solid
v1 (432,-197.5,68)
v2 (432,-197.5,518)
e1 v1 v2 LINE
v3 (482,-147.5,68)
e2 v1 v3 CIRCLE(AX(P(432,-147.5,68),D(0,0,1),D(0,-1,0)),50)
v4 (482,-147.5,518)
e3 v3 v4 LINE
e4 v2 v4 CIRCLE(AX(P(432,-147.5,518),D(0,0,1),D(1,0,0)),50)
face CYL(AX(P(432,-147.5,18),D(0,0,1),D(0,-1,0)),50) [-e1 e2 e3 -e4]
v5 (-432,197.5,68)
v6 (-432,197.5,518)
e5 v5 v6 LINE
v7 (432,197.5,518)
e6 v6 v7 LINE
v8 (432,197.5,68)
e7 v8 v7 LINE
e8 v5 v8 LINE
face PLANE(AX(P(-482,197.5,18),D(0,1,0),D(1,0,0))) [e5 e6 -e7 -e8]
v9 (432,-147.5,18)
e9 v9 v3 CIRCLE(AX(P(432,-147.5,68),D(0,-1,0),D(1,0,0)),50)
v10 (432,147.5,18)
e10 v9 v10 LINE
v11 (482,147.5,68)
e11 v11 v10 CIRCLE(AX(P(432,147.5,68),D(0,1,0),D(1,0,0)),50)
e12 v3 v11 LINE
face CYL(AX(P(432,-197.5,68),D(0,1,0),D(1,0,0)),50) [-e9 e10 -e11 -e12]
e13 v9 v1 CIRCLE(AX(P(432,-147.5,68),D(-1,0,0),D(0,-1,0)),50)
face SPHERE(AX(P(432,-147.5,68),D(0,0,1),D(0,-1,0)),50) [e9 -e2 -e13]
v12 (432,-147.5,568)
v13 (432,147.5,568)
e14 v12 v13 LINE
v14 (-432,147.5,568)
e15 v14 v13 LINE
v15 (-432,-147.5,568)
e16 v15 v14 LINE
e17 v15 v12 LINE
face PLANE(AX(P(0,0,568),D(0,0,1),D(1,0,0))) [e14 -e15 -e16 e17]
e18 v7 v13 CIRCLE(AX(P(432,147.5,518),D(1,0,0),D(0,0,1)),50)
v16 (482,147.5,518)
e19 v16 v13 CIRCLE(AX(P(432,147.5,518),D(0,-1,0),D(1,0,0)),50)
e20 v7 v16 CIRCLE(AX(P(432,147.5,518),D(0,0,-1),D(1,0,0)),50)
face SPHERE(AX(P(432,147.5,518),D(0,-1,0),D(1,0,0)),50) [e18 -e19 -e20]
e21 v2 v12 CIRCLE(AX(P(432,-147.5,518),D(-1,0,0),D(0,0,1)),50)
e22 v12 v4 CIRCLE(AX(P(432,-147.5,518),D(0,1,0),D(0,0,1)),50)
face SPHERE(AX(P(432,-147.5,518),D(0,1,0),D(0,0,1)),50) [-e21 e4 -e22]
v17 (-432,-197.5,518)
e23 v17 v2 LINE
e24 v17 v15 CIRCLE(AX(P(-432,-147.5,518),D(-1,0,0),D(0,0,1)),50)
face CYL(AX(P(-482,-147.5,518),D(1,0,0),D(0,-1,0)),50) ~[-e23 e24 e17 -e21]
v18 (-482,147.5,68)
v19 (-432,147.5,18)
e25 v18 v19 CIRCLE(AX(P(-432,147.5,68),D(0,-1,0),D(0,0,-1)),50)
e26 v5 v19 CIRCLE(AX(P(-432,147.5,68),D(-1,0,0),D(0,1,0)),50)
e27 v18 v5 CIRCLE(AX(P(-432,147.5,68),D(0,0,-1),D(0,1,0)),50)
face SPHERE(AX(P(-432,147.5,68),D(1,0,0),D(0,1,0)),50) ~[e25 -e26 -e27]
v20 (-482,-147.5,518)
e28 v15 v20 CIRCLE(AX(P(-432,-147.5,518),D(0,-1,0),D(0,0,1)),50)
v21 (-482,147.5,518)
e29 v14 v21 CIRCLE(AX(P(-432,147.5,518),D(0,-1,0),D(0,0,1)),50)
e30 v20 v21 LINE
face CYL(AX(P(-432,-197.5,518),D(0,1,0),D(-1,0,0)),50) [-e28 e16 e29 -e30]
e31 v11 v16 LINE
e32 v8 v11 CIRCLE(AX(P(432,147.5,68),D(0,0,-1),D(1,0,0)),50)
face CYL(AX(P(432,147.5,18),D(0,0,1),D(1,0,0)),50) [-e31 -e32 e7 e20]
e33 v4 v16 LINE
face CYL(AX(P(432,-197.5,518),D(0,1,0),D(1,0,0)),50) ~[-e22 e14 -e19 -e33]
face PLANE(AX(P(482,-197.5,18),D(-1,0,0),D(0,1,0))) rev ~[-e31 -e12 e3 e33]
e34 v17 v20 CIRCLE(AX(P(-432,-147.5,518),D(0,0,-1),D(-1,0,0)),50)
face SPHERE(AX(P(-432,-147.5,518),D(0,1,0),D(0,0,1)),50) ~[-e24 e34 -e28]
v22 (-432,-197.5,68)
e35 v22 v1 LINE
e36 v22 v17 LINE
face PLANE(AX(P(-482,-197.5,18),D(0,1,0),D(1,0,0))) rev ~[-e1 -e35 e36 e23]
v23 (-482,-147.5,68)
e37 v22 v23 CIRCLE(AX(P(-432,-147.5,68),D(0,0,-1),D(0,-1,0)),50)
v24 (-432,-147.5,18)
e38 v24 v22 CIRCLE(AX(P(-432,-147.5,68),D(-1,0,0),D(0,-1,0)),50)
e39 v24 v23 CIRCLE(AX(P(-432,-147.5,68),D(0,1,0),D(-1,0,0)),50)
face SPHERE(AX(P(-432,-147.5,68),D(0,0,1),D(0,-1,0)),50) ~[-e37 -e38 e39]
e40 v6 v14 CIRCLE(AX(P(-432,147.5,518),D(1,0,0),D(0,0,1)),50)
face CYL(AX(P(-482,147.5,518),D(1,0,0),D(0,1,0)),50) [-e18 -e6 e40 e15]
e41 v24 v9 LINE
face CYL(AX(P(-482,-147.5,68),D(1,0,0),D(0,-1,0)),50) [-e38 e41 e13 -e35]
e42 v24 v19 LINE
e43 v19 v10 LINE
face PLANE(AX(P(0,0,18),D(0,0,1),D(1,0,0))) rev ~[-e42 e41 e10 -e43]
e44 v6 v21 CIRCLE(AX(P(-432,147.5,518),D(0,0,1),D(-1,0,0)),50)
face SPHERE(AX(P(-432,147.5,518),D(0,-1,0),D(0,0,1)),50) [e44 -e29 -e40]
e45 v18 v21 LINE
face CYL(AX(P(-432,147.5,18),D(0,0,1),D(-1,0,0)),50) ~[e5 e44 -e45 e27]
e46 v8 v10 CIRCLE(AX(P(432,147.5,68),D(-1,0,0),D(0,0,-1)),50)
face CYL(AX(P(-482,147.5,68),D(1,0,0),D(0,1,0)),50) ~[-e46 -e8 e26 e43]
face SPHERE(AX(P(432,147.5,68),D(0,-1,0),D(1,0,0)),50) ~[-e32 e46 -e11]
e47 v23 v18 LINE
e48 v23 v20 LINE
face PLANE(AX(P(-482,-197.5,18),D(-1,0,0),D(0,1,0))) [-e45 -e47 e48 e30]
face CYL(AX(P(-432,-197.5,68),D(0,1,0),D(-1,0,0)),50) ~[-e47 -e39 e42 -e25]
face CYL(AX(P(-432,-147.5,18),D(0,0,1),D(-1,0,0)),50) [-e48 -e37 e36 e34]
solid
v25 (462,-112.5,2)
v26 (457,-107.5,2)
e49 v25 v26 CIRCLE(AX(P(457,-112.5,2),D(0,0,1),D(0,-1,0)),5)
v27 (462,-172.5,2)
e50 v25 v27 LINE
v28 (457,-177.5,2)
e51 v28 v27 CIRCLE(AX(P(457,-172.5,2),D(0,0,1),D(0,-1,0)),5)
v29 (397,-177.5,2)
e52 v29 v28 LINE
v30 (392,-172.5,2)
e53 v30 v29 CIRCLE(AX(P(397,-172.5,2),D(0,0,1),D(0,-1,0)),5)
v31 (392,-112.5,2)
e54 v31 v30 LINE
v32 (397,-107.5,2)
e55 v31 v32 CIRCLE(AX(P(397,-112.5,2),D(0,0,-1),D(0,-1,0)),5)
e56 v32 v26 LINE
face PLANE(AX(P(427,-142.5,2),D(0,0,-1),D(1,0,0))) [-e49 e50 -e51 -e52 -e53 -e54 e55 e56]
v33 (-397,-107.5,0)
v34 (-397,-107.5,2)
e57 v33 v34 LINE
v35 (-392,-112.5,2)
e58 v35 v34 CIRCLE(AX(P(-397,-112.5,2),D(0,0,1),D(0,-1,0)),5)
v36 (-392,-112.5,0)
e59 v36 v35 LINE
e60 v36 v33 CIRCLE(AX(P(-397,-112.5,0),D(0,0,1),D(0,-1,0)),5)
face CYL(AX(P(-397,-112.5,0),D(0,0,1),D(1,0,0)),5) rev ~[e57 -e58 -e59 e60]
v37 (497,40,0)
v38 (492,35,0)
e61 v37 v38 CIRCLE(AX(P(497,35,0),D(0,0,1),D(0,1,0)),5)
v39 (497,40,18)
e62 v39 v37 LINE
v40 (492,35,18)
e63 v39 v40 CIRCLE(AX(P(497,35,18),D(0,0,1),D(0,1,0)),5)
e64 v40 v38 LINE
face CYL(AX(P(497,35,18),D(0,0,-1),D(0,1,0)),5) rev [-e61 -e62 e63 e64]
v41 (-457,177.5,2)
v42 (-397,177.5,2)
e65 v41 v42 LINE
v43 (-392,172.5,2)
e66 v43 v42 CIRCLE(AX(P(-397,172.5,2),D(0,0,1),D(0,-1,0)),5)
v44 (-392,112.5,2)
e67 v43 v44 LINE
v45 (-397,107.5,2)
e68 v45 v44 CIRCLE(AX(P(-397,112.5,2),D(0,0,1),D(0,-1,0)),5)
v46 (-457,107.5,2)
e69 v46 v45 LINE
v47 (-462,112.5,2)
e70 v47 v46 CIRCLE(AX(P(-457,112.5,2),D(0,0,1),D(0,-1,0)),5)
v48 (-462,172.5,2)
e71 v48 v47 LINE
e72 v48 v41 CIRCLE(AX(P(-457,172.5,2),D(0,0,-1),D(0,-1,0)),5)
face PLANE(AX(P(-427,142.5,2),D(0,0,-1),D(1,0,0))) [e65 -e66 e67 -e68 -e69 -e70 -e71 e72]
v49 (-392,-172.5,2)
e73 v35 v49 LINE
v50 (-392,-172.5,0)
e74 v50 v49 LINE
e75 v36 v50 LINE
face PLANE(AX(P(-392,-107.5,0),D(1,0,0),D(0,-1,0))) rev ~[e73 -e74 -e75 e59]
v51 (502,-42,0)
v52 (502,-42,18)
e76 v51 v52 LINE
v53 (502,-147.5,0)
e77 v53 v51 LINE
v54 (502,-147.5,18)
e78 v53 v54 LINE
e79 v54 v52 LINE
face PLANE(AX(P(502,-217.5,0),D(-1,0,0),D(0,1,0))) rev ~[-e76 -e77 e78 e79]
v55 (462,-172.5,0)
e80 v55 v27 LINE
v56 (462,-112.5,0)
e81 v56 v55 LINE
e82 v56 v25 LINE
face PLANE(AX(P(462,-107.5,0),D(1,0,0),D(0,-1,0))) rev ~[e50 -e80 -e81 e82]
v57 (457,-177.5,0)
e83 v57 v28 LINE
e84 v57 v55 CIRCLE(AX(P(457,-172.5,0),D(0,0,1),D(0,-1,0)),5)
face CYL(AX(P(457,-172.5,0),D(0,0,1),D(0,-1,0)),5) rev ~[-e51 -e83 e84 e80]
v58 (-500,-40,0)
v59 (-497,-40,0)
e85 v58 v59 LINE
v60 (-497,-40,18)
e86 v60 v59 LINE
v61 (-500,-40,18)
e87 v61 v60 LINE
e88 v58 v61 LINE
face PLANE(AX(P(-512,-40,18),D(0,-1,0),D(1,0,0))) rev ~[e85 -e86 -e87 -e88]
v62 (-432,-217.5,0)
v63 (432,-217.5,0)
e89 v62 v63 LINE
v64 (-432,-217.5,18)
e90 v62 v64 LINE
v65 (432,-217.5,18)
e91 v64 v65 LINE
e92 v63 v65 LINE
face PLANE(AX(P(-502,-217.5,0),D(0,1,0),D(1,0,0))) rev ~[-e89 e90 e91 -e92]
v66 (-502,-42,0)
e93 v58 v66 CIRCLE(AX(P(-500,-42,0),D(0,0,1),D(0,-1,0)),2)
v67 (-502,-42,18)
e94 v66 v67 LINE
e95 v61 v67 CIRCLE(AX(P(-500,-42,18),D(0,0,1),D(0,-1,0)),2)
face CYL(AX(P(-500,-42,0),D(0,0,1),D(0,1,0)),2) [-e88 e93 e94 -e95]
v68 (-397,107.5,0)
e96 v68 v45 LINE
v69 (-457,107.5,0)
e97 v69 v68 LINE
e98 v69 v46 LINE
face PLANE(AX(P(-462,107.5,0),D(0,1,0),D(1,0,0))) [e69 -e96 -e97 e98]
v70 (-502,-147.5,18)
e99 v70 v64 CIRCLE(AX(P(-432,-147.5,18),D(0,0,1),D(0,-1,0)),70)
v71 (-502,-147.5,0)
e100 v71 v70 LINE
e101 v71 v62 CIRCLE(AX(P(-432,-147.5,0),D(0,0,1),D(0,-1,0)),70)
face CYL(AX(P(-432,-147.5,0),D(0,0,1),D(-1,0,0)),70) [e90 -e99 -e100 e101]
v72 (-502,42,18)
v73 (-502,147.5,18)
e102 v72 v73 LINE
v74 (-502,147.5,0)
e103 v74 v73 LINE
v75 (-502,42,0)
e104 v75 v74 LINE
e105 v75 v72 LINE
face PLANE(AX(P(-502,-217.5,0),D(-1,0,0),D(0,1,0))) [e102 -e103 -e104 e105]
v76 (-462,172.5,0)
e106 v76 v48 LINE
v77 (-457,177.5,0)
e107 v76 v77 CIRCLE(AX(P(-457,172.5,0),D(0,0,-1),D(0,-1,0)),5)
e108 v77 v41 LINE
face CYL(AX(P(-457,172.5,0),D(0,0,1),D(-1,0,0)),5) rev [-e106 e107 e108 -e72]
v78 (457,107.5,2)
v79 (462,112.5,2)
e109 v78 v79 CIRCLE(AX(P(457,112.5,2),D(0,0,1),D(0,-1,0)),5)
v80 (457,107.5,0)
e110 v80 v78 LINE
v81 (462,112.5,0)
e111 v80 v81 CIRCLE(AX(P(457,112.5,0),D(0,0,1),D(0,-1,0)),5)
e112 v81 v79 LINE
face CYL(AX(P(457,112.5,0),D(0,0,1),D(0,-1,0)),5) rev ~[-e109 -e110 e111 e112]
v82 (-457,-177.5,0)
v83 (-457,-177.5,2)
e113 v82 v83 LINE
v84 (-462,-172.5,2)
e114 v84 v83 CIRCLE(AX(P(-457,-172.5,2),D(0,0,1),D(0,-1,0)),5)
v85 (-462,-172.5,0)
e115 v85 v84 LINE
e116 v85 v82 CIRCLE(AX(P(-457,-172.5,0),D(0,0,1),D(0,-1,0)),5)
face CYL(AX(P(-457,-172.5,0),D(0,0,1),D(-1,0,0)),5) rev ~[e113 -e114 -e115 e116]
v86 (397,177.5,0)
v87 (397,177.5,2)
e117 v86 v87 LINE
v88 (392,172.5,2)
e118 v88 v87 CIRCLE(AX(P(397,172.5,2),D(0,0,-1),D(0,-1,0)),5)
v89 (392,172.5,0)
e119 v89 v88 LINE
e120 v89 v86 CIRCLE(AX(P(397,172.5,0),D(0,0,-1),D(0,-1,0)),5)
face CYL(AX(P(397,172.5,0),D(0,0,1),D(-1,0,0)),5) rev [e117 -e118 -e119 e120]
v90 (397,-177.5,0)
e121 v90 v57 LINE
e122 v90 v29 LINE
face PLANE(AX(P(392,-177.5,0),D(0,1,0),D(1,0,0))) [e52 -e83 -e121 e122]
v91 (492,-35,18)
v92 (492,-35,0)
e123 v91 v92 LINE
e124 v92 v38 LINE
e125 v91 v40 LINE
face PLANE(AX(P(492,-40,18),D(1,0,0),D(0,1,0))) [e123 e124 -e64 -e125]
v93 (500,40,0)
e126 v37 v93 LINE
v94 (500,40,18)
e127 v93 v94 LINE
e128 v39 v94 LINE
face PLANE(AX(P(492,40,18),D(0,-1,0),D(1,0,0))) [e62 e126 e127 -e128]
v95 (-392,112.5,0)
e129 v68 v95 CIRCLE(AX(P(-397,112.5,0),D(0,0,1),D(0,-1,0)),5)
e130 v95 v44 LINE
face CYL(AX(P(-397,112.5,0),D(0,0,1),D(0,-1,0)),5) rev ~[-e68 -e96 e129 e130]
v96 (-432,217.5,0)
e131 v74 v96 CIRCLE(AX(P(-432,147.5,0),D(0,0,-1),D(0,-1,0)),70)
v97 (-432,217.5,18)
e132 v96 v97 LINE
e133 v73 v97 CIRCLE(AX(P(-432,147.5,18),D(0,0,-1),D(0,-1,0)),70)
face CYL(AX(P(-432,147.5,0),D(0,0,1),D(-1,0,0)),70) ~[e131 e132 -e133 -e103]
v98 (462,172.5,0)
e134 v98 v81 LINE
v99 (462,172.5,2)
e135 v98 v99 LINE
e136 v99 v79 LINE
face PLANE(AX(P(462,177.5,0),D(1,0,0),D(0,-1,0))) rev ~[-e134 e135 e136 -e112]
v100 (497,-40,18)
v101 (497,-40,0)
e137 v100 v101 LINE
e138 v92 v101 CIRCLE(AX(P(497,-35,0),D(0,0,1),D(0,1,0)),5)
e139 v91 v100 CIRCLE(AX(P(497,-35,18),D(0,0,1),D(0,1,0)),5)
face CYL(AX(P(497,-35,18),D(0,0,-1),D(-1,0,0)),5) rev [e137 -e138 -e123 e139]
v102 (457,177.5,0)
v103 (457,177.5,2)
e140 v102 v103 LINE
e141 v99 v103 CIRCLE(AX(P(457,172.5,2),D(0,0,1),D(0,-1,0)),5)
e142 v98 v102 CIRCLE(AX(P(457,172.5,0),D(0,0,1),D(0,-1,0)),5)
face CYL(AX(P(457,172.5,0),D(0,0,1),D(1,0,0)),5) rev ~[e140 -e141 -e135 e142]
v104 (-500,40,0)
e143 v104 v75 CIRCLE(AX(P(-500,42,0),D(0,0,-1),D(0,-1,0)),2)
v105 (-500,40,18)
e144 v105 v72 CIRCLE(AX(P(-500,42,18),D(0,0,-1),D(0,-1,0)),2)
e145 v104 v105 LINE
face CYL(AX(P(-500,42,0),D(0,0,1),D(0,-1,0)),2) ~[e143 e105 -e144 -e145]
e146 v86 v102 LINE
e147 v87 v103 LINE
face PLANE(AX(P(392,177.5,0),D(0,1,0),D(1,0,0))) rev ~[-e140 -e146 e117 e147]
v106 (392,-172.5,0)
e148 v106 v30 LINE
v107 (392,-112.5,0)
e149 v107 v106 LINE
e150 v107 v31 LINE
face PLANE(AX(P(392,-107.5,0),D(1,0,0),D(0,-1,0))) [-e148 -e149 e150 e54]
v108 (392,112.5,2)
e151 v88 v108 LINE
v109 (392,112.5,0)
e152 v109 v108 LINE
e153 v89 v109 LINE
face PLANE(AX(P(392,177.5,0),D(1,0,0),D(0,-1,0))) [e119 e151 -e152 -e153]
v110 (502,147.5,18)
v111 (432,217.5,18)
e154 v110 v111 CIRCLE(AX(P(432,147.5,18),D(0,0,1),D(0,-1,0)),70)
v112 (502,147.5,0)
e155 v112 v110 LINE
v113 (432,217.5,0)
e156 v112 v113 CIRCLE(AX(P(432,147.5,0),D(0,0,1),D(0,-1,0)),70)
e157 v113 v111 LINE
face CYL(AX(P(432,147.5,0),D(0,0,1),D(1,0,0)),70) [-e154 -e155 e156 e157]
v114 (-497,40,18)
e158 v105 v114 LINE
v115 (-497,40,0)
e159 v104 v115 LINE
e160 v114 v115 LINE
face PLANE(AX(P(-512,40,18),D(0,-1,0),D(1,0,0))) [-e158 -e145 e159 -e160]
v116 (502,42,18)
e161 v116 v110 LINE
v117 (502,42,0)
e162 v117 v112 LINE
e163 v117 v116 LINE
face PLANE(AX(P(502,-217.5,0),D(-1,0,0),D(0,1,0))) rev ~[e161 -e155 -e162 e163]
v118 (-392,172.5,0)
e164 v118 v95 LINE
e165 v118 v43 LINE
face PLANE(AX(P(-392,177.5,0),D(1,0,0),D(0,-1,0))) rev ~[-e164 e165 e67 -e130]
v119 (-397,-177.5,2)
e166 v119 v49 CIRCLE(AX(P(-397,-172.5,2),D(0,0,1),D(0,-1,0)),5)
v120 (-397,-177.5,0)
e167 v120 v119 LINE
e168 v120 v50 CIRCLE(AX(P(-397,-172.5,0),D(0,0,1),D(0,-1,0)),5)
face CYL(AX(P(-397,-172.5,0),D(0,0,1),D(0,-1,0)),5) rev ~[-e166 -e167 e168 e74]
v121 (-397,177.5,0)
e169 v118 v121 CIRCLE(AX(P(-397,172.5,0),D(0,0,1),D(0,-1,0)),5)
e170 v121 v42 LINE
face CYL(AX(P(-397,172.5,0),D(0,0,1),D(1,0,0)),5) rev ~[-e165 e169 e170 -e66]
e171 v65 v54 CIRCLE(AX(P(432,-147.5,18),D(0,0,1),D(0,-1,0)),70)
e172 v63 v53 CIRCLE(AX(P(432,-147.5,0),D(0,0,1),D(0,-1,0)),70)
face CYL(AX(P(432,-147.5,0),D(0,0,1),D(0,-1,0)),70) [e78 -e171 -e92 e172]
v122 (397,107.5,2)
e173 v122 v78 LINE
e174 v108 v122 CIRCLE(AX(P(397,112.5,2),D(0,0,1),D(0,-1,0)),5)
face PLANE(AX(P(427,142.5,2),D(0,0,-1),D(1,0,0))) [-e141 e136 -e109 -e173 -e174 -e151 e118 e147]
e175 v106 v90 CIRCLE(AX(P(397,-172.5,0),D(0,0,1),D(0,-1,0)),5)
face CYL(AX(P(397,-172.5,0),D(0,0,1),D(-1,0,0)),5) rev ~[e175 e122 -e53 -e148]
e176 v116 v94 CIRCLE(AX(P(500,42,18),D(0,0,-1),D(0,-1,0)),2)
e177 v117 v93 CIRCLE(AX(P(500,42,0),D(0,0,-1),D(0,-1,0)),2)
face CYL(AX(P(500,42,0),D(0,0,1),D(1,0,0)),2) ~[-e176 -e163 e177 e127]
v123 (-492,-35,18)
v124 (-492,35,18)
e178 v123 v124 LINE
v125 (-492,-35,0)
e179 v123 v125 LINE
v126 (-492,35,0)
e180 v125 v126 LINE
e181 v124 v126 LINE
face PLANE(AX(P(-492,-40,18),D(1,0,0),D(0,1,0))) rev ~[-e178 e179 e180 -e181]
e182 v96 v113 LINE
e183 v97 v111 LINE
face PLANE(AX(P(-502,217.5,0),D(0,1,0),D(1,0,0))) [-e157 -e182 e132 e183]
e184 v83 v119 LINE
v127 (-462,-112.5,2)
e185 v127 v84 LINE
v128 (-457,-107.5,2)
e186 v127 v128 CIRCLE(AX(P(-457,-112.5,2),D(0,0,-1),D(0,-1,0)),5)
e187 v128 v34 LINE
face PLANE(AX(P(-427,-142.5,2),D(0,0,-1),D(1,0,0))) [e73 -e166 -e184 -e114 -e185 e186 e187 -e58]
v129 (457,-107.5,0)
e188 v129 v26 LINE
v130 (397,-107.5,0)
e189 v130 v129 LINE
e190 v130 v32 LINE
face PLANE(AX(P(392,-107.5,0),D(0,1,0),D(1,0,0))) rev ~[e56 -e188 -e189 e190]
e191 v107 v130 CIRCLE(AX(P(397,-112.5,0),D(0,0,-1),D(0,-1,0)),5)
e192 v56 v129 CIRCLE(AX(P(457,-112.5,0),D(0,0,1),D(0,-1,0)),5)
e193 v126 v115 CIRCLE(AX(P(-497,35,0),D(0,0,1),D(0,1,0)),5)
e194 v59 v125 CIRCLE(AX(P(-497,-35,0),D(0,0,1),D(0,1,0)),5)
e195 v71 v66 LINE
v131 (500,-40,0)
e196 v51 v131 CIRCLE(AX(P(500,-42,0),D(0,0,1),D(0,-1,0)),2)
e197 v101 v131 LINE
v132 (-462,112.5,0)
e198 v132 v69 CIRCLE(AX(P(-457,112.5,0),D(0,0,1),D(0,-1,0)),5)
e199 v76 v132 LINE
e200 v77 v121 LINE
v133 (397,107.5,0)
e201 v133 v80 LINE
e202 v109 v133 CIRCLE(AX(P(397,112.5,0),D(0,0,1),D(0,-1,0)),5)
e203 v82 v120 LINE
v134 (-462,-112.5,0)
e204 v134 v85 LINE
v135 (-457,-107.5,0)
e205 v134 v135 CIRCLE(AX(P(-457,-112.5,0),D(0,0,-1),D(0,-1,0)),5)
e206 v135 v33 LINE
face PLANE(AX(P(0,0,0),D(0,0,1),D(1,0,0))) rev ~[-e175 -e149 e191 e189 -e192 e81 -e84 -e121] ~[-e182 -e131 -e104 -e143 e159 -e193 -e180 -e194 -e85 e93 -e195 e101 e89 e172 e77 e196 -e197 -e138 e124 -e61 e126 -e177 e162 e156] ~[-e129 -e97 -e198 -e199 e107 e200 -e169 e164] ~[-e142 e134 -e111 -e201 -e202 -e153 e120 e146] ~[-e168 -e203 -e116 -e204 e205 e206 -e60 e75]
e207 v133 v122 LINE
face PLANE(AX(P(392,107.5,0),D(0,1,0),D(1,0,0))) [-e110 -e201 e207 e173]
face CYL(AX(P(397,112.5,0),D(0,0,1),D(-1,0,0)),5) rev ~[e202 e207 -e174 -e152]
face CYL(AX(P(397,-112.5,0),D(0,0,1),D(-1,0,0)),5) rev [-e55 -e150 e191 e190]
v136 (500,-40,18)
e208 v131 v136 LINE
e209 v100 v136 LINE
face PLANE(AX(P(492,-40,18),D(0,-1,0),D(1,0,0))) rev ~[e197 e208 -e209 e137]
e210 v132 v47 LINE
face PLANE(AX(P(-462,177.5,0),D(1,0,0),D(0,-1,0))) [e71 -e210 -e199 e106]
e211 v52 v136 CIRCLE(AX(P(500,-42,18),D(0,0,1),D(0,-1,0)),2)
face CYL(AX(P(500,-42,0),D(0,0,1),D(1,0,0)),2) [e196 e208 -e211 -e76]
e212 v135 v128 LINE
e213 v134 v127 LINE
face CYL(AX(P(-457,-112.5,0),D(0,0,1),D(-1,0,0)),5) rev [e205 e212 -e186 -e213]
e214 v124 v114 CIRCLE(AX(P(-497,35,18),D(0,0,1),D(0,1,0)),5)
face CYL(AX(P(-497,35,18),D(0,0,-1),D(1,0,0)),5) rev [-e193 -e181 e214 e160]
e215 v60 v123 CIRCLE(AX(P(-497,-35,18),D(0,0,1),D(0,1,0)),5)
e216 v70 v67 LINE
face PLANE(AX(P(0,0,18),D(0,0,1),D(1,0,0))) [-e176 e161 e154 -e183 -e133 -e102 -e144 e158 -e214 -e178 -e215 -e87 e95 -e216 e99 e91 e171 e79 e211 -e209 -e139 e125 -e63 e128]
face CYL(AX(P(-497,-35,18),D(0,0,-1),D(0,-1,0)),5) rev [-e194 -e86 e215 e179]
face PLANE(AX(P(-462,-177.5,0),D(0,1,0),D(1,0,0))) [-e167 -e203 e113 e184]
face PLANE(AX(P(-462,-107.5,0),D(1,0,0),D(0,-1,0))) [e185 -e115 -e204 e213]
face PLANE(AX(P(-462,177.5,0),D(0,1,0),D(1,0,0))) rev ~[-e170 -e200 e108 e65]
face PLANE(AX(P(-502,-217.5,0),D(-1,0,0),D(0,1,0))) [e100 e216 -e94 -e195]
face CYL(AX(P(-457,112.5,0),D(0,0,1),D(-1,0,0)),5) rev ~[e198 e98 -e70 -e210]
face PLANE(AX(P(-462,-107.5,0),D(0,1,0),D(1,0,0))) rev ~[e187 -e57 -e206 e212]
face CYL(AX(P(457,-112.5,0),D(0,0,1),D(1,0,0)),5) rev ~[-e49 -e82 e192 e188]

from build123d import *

# Parameters (mm, degrees)
F0_W      = 1004
F0_H      = 435
F1_DEPTH  = 18
F2_R      = 70
F3_W      = 70
F3_H      = 70
F4_DEPTH  = 2
F5_R      = 5
F6_W      = 20
F6_H      = 80
F7_DEPTH  = 18
F8_R      = 5
F9_W      = 964
F9_H      = 395
F10_DEPTH = 550
F11_R     = 50
F12_R     = 2


with BuildPart() as f1:
    # F0 (on Top) → F1 (new body)
    with BuildSketch(Plane.XY):
        Rectangle(F0_W, F0_H)
    extrude(amount=F1_DEPTH)

    # F2
    f2_edges = [f1.edges().sort_by_distance(p)[0] for p in [
        (-502, -217.5, 9),
        (-502, 217.5, 9),
        (502, 217.5, 9),
        (502, -217.5, 9),
    ]]
    fillet(f2_edges, radius=F2_R)

    # F3 (on face) → F4 (cut)
    with BuildSketch(Plane(origin=(0, 0, 0), x_dir=(1, 0, 0), z_dir=(0, 0, -1))):
        with Locations((-427, 142.5)):
            Rectangle(F3_W, F3_H)
        with Locations((-427, -142.5)):
            Rectangle(F3_W, F3_H)
        with Locations((427, -142.5)):
            Rectangle(F3_W, F3_H)
        with Locations((427, 142.5)):
            Rectangle(F3_W, F3_H)
    extrude(amount=-F4_DEPTH, mode=Mode.SUBTRACT)

    # F5
    f5_edges = [f1.edges().sort_by_distance(p)[0] for p in [
        (-462, -177.5, 1),
        (-392, -177.5, 1),
        (-462, -107.5, 1),
        (-392, -107.5, 1),
        (-392, 177.5, 1),
        (-462, 177.5, 1),
        (-392, 107.5, 1),
        (-462, 107.5, 1),
        (392, 107.5, 1),
        (462, 107.5, 1),
        (392, 177.5, 1),
        (462, 177.5, 1),
        (462, -107.5, 1),
        (392, -107.5, 1),
        (462, -177.5, 1),
        (392, -177.5, 1),
    ]]
    fillet(f5_edges, radius=F5_R)

    # F6 (on face) → F7 (cut)
    with BuildSketch(Plane.XY.offset(18)):
        with Locations((-502, 0)):
            Rectangle(F6_W, F6_H)
        with Locations((502, 0)):
            Rectangle(F6_W, F6_H)
    extrude(amount=-F7_DEPTH, mode=Mode.SUBTRACT)

    # F8
    f8_edges = [f1.edges().sort_by_distance(p)[0] for p in [
        (-492, 40, 9),
        (-492, -40, 9),
        (492, -40, 9),
        (492, 40, 9),
    ]]
    fillet(f8_edges, radius=F8_R)

    # F12
    f12_edges = [f1.edges().sort_by_distance(p)[0] for p in [
        (-502, -40, 9),
        (-502, 40, 9),
        (502, 40, 9),
        (502, -40, 9),
    ]]
    fillet(f12_edges, radius=F12_R)


with BuildPart() as f10:
    # F9 (on face) → F10 (new body)
    with BuildSketch(Plane.XY.offset(18)):
        Rectangle(F9_W, F9_H)
    extrude(amount=F10_DEPTH)

    # F11
    f11_edges = [f10.edges().sort_by_distance(p)[0] for p in [
        (482, 0, 568),
        (-482, 0, 568),
        (0, -197.5, 568),
        (482, -197.5, 293),
        (-482, -197.5, 293),
        (0, -197.5, 18),
        (482, 0, 18),
        (482, 197.5, 293),
        (0, 197.5, 568),
        (0, 197.5, 18),
        (-482, 197.5, 293),
        (-482, 0, 18),
    ]]
    fillet(f11_edges, radius=F11_R)


solid = Compound([f1.part, f10.part])
